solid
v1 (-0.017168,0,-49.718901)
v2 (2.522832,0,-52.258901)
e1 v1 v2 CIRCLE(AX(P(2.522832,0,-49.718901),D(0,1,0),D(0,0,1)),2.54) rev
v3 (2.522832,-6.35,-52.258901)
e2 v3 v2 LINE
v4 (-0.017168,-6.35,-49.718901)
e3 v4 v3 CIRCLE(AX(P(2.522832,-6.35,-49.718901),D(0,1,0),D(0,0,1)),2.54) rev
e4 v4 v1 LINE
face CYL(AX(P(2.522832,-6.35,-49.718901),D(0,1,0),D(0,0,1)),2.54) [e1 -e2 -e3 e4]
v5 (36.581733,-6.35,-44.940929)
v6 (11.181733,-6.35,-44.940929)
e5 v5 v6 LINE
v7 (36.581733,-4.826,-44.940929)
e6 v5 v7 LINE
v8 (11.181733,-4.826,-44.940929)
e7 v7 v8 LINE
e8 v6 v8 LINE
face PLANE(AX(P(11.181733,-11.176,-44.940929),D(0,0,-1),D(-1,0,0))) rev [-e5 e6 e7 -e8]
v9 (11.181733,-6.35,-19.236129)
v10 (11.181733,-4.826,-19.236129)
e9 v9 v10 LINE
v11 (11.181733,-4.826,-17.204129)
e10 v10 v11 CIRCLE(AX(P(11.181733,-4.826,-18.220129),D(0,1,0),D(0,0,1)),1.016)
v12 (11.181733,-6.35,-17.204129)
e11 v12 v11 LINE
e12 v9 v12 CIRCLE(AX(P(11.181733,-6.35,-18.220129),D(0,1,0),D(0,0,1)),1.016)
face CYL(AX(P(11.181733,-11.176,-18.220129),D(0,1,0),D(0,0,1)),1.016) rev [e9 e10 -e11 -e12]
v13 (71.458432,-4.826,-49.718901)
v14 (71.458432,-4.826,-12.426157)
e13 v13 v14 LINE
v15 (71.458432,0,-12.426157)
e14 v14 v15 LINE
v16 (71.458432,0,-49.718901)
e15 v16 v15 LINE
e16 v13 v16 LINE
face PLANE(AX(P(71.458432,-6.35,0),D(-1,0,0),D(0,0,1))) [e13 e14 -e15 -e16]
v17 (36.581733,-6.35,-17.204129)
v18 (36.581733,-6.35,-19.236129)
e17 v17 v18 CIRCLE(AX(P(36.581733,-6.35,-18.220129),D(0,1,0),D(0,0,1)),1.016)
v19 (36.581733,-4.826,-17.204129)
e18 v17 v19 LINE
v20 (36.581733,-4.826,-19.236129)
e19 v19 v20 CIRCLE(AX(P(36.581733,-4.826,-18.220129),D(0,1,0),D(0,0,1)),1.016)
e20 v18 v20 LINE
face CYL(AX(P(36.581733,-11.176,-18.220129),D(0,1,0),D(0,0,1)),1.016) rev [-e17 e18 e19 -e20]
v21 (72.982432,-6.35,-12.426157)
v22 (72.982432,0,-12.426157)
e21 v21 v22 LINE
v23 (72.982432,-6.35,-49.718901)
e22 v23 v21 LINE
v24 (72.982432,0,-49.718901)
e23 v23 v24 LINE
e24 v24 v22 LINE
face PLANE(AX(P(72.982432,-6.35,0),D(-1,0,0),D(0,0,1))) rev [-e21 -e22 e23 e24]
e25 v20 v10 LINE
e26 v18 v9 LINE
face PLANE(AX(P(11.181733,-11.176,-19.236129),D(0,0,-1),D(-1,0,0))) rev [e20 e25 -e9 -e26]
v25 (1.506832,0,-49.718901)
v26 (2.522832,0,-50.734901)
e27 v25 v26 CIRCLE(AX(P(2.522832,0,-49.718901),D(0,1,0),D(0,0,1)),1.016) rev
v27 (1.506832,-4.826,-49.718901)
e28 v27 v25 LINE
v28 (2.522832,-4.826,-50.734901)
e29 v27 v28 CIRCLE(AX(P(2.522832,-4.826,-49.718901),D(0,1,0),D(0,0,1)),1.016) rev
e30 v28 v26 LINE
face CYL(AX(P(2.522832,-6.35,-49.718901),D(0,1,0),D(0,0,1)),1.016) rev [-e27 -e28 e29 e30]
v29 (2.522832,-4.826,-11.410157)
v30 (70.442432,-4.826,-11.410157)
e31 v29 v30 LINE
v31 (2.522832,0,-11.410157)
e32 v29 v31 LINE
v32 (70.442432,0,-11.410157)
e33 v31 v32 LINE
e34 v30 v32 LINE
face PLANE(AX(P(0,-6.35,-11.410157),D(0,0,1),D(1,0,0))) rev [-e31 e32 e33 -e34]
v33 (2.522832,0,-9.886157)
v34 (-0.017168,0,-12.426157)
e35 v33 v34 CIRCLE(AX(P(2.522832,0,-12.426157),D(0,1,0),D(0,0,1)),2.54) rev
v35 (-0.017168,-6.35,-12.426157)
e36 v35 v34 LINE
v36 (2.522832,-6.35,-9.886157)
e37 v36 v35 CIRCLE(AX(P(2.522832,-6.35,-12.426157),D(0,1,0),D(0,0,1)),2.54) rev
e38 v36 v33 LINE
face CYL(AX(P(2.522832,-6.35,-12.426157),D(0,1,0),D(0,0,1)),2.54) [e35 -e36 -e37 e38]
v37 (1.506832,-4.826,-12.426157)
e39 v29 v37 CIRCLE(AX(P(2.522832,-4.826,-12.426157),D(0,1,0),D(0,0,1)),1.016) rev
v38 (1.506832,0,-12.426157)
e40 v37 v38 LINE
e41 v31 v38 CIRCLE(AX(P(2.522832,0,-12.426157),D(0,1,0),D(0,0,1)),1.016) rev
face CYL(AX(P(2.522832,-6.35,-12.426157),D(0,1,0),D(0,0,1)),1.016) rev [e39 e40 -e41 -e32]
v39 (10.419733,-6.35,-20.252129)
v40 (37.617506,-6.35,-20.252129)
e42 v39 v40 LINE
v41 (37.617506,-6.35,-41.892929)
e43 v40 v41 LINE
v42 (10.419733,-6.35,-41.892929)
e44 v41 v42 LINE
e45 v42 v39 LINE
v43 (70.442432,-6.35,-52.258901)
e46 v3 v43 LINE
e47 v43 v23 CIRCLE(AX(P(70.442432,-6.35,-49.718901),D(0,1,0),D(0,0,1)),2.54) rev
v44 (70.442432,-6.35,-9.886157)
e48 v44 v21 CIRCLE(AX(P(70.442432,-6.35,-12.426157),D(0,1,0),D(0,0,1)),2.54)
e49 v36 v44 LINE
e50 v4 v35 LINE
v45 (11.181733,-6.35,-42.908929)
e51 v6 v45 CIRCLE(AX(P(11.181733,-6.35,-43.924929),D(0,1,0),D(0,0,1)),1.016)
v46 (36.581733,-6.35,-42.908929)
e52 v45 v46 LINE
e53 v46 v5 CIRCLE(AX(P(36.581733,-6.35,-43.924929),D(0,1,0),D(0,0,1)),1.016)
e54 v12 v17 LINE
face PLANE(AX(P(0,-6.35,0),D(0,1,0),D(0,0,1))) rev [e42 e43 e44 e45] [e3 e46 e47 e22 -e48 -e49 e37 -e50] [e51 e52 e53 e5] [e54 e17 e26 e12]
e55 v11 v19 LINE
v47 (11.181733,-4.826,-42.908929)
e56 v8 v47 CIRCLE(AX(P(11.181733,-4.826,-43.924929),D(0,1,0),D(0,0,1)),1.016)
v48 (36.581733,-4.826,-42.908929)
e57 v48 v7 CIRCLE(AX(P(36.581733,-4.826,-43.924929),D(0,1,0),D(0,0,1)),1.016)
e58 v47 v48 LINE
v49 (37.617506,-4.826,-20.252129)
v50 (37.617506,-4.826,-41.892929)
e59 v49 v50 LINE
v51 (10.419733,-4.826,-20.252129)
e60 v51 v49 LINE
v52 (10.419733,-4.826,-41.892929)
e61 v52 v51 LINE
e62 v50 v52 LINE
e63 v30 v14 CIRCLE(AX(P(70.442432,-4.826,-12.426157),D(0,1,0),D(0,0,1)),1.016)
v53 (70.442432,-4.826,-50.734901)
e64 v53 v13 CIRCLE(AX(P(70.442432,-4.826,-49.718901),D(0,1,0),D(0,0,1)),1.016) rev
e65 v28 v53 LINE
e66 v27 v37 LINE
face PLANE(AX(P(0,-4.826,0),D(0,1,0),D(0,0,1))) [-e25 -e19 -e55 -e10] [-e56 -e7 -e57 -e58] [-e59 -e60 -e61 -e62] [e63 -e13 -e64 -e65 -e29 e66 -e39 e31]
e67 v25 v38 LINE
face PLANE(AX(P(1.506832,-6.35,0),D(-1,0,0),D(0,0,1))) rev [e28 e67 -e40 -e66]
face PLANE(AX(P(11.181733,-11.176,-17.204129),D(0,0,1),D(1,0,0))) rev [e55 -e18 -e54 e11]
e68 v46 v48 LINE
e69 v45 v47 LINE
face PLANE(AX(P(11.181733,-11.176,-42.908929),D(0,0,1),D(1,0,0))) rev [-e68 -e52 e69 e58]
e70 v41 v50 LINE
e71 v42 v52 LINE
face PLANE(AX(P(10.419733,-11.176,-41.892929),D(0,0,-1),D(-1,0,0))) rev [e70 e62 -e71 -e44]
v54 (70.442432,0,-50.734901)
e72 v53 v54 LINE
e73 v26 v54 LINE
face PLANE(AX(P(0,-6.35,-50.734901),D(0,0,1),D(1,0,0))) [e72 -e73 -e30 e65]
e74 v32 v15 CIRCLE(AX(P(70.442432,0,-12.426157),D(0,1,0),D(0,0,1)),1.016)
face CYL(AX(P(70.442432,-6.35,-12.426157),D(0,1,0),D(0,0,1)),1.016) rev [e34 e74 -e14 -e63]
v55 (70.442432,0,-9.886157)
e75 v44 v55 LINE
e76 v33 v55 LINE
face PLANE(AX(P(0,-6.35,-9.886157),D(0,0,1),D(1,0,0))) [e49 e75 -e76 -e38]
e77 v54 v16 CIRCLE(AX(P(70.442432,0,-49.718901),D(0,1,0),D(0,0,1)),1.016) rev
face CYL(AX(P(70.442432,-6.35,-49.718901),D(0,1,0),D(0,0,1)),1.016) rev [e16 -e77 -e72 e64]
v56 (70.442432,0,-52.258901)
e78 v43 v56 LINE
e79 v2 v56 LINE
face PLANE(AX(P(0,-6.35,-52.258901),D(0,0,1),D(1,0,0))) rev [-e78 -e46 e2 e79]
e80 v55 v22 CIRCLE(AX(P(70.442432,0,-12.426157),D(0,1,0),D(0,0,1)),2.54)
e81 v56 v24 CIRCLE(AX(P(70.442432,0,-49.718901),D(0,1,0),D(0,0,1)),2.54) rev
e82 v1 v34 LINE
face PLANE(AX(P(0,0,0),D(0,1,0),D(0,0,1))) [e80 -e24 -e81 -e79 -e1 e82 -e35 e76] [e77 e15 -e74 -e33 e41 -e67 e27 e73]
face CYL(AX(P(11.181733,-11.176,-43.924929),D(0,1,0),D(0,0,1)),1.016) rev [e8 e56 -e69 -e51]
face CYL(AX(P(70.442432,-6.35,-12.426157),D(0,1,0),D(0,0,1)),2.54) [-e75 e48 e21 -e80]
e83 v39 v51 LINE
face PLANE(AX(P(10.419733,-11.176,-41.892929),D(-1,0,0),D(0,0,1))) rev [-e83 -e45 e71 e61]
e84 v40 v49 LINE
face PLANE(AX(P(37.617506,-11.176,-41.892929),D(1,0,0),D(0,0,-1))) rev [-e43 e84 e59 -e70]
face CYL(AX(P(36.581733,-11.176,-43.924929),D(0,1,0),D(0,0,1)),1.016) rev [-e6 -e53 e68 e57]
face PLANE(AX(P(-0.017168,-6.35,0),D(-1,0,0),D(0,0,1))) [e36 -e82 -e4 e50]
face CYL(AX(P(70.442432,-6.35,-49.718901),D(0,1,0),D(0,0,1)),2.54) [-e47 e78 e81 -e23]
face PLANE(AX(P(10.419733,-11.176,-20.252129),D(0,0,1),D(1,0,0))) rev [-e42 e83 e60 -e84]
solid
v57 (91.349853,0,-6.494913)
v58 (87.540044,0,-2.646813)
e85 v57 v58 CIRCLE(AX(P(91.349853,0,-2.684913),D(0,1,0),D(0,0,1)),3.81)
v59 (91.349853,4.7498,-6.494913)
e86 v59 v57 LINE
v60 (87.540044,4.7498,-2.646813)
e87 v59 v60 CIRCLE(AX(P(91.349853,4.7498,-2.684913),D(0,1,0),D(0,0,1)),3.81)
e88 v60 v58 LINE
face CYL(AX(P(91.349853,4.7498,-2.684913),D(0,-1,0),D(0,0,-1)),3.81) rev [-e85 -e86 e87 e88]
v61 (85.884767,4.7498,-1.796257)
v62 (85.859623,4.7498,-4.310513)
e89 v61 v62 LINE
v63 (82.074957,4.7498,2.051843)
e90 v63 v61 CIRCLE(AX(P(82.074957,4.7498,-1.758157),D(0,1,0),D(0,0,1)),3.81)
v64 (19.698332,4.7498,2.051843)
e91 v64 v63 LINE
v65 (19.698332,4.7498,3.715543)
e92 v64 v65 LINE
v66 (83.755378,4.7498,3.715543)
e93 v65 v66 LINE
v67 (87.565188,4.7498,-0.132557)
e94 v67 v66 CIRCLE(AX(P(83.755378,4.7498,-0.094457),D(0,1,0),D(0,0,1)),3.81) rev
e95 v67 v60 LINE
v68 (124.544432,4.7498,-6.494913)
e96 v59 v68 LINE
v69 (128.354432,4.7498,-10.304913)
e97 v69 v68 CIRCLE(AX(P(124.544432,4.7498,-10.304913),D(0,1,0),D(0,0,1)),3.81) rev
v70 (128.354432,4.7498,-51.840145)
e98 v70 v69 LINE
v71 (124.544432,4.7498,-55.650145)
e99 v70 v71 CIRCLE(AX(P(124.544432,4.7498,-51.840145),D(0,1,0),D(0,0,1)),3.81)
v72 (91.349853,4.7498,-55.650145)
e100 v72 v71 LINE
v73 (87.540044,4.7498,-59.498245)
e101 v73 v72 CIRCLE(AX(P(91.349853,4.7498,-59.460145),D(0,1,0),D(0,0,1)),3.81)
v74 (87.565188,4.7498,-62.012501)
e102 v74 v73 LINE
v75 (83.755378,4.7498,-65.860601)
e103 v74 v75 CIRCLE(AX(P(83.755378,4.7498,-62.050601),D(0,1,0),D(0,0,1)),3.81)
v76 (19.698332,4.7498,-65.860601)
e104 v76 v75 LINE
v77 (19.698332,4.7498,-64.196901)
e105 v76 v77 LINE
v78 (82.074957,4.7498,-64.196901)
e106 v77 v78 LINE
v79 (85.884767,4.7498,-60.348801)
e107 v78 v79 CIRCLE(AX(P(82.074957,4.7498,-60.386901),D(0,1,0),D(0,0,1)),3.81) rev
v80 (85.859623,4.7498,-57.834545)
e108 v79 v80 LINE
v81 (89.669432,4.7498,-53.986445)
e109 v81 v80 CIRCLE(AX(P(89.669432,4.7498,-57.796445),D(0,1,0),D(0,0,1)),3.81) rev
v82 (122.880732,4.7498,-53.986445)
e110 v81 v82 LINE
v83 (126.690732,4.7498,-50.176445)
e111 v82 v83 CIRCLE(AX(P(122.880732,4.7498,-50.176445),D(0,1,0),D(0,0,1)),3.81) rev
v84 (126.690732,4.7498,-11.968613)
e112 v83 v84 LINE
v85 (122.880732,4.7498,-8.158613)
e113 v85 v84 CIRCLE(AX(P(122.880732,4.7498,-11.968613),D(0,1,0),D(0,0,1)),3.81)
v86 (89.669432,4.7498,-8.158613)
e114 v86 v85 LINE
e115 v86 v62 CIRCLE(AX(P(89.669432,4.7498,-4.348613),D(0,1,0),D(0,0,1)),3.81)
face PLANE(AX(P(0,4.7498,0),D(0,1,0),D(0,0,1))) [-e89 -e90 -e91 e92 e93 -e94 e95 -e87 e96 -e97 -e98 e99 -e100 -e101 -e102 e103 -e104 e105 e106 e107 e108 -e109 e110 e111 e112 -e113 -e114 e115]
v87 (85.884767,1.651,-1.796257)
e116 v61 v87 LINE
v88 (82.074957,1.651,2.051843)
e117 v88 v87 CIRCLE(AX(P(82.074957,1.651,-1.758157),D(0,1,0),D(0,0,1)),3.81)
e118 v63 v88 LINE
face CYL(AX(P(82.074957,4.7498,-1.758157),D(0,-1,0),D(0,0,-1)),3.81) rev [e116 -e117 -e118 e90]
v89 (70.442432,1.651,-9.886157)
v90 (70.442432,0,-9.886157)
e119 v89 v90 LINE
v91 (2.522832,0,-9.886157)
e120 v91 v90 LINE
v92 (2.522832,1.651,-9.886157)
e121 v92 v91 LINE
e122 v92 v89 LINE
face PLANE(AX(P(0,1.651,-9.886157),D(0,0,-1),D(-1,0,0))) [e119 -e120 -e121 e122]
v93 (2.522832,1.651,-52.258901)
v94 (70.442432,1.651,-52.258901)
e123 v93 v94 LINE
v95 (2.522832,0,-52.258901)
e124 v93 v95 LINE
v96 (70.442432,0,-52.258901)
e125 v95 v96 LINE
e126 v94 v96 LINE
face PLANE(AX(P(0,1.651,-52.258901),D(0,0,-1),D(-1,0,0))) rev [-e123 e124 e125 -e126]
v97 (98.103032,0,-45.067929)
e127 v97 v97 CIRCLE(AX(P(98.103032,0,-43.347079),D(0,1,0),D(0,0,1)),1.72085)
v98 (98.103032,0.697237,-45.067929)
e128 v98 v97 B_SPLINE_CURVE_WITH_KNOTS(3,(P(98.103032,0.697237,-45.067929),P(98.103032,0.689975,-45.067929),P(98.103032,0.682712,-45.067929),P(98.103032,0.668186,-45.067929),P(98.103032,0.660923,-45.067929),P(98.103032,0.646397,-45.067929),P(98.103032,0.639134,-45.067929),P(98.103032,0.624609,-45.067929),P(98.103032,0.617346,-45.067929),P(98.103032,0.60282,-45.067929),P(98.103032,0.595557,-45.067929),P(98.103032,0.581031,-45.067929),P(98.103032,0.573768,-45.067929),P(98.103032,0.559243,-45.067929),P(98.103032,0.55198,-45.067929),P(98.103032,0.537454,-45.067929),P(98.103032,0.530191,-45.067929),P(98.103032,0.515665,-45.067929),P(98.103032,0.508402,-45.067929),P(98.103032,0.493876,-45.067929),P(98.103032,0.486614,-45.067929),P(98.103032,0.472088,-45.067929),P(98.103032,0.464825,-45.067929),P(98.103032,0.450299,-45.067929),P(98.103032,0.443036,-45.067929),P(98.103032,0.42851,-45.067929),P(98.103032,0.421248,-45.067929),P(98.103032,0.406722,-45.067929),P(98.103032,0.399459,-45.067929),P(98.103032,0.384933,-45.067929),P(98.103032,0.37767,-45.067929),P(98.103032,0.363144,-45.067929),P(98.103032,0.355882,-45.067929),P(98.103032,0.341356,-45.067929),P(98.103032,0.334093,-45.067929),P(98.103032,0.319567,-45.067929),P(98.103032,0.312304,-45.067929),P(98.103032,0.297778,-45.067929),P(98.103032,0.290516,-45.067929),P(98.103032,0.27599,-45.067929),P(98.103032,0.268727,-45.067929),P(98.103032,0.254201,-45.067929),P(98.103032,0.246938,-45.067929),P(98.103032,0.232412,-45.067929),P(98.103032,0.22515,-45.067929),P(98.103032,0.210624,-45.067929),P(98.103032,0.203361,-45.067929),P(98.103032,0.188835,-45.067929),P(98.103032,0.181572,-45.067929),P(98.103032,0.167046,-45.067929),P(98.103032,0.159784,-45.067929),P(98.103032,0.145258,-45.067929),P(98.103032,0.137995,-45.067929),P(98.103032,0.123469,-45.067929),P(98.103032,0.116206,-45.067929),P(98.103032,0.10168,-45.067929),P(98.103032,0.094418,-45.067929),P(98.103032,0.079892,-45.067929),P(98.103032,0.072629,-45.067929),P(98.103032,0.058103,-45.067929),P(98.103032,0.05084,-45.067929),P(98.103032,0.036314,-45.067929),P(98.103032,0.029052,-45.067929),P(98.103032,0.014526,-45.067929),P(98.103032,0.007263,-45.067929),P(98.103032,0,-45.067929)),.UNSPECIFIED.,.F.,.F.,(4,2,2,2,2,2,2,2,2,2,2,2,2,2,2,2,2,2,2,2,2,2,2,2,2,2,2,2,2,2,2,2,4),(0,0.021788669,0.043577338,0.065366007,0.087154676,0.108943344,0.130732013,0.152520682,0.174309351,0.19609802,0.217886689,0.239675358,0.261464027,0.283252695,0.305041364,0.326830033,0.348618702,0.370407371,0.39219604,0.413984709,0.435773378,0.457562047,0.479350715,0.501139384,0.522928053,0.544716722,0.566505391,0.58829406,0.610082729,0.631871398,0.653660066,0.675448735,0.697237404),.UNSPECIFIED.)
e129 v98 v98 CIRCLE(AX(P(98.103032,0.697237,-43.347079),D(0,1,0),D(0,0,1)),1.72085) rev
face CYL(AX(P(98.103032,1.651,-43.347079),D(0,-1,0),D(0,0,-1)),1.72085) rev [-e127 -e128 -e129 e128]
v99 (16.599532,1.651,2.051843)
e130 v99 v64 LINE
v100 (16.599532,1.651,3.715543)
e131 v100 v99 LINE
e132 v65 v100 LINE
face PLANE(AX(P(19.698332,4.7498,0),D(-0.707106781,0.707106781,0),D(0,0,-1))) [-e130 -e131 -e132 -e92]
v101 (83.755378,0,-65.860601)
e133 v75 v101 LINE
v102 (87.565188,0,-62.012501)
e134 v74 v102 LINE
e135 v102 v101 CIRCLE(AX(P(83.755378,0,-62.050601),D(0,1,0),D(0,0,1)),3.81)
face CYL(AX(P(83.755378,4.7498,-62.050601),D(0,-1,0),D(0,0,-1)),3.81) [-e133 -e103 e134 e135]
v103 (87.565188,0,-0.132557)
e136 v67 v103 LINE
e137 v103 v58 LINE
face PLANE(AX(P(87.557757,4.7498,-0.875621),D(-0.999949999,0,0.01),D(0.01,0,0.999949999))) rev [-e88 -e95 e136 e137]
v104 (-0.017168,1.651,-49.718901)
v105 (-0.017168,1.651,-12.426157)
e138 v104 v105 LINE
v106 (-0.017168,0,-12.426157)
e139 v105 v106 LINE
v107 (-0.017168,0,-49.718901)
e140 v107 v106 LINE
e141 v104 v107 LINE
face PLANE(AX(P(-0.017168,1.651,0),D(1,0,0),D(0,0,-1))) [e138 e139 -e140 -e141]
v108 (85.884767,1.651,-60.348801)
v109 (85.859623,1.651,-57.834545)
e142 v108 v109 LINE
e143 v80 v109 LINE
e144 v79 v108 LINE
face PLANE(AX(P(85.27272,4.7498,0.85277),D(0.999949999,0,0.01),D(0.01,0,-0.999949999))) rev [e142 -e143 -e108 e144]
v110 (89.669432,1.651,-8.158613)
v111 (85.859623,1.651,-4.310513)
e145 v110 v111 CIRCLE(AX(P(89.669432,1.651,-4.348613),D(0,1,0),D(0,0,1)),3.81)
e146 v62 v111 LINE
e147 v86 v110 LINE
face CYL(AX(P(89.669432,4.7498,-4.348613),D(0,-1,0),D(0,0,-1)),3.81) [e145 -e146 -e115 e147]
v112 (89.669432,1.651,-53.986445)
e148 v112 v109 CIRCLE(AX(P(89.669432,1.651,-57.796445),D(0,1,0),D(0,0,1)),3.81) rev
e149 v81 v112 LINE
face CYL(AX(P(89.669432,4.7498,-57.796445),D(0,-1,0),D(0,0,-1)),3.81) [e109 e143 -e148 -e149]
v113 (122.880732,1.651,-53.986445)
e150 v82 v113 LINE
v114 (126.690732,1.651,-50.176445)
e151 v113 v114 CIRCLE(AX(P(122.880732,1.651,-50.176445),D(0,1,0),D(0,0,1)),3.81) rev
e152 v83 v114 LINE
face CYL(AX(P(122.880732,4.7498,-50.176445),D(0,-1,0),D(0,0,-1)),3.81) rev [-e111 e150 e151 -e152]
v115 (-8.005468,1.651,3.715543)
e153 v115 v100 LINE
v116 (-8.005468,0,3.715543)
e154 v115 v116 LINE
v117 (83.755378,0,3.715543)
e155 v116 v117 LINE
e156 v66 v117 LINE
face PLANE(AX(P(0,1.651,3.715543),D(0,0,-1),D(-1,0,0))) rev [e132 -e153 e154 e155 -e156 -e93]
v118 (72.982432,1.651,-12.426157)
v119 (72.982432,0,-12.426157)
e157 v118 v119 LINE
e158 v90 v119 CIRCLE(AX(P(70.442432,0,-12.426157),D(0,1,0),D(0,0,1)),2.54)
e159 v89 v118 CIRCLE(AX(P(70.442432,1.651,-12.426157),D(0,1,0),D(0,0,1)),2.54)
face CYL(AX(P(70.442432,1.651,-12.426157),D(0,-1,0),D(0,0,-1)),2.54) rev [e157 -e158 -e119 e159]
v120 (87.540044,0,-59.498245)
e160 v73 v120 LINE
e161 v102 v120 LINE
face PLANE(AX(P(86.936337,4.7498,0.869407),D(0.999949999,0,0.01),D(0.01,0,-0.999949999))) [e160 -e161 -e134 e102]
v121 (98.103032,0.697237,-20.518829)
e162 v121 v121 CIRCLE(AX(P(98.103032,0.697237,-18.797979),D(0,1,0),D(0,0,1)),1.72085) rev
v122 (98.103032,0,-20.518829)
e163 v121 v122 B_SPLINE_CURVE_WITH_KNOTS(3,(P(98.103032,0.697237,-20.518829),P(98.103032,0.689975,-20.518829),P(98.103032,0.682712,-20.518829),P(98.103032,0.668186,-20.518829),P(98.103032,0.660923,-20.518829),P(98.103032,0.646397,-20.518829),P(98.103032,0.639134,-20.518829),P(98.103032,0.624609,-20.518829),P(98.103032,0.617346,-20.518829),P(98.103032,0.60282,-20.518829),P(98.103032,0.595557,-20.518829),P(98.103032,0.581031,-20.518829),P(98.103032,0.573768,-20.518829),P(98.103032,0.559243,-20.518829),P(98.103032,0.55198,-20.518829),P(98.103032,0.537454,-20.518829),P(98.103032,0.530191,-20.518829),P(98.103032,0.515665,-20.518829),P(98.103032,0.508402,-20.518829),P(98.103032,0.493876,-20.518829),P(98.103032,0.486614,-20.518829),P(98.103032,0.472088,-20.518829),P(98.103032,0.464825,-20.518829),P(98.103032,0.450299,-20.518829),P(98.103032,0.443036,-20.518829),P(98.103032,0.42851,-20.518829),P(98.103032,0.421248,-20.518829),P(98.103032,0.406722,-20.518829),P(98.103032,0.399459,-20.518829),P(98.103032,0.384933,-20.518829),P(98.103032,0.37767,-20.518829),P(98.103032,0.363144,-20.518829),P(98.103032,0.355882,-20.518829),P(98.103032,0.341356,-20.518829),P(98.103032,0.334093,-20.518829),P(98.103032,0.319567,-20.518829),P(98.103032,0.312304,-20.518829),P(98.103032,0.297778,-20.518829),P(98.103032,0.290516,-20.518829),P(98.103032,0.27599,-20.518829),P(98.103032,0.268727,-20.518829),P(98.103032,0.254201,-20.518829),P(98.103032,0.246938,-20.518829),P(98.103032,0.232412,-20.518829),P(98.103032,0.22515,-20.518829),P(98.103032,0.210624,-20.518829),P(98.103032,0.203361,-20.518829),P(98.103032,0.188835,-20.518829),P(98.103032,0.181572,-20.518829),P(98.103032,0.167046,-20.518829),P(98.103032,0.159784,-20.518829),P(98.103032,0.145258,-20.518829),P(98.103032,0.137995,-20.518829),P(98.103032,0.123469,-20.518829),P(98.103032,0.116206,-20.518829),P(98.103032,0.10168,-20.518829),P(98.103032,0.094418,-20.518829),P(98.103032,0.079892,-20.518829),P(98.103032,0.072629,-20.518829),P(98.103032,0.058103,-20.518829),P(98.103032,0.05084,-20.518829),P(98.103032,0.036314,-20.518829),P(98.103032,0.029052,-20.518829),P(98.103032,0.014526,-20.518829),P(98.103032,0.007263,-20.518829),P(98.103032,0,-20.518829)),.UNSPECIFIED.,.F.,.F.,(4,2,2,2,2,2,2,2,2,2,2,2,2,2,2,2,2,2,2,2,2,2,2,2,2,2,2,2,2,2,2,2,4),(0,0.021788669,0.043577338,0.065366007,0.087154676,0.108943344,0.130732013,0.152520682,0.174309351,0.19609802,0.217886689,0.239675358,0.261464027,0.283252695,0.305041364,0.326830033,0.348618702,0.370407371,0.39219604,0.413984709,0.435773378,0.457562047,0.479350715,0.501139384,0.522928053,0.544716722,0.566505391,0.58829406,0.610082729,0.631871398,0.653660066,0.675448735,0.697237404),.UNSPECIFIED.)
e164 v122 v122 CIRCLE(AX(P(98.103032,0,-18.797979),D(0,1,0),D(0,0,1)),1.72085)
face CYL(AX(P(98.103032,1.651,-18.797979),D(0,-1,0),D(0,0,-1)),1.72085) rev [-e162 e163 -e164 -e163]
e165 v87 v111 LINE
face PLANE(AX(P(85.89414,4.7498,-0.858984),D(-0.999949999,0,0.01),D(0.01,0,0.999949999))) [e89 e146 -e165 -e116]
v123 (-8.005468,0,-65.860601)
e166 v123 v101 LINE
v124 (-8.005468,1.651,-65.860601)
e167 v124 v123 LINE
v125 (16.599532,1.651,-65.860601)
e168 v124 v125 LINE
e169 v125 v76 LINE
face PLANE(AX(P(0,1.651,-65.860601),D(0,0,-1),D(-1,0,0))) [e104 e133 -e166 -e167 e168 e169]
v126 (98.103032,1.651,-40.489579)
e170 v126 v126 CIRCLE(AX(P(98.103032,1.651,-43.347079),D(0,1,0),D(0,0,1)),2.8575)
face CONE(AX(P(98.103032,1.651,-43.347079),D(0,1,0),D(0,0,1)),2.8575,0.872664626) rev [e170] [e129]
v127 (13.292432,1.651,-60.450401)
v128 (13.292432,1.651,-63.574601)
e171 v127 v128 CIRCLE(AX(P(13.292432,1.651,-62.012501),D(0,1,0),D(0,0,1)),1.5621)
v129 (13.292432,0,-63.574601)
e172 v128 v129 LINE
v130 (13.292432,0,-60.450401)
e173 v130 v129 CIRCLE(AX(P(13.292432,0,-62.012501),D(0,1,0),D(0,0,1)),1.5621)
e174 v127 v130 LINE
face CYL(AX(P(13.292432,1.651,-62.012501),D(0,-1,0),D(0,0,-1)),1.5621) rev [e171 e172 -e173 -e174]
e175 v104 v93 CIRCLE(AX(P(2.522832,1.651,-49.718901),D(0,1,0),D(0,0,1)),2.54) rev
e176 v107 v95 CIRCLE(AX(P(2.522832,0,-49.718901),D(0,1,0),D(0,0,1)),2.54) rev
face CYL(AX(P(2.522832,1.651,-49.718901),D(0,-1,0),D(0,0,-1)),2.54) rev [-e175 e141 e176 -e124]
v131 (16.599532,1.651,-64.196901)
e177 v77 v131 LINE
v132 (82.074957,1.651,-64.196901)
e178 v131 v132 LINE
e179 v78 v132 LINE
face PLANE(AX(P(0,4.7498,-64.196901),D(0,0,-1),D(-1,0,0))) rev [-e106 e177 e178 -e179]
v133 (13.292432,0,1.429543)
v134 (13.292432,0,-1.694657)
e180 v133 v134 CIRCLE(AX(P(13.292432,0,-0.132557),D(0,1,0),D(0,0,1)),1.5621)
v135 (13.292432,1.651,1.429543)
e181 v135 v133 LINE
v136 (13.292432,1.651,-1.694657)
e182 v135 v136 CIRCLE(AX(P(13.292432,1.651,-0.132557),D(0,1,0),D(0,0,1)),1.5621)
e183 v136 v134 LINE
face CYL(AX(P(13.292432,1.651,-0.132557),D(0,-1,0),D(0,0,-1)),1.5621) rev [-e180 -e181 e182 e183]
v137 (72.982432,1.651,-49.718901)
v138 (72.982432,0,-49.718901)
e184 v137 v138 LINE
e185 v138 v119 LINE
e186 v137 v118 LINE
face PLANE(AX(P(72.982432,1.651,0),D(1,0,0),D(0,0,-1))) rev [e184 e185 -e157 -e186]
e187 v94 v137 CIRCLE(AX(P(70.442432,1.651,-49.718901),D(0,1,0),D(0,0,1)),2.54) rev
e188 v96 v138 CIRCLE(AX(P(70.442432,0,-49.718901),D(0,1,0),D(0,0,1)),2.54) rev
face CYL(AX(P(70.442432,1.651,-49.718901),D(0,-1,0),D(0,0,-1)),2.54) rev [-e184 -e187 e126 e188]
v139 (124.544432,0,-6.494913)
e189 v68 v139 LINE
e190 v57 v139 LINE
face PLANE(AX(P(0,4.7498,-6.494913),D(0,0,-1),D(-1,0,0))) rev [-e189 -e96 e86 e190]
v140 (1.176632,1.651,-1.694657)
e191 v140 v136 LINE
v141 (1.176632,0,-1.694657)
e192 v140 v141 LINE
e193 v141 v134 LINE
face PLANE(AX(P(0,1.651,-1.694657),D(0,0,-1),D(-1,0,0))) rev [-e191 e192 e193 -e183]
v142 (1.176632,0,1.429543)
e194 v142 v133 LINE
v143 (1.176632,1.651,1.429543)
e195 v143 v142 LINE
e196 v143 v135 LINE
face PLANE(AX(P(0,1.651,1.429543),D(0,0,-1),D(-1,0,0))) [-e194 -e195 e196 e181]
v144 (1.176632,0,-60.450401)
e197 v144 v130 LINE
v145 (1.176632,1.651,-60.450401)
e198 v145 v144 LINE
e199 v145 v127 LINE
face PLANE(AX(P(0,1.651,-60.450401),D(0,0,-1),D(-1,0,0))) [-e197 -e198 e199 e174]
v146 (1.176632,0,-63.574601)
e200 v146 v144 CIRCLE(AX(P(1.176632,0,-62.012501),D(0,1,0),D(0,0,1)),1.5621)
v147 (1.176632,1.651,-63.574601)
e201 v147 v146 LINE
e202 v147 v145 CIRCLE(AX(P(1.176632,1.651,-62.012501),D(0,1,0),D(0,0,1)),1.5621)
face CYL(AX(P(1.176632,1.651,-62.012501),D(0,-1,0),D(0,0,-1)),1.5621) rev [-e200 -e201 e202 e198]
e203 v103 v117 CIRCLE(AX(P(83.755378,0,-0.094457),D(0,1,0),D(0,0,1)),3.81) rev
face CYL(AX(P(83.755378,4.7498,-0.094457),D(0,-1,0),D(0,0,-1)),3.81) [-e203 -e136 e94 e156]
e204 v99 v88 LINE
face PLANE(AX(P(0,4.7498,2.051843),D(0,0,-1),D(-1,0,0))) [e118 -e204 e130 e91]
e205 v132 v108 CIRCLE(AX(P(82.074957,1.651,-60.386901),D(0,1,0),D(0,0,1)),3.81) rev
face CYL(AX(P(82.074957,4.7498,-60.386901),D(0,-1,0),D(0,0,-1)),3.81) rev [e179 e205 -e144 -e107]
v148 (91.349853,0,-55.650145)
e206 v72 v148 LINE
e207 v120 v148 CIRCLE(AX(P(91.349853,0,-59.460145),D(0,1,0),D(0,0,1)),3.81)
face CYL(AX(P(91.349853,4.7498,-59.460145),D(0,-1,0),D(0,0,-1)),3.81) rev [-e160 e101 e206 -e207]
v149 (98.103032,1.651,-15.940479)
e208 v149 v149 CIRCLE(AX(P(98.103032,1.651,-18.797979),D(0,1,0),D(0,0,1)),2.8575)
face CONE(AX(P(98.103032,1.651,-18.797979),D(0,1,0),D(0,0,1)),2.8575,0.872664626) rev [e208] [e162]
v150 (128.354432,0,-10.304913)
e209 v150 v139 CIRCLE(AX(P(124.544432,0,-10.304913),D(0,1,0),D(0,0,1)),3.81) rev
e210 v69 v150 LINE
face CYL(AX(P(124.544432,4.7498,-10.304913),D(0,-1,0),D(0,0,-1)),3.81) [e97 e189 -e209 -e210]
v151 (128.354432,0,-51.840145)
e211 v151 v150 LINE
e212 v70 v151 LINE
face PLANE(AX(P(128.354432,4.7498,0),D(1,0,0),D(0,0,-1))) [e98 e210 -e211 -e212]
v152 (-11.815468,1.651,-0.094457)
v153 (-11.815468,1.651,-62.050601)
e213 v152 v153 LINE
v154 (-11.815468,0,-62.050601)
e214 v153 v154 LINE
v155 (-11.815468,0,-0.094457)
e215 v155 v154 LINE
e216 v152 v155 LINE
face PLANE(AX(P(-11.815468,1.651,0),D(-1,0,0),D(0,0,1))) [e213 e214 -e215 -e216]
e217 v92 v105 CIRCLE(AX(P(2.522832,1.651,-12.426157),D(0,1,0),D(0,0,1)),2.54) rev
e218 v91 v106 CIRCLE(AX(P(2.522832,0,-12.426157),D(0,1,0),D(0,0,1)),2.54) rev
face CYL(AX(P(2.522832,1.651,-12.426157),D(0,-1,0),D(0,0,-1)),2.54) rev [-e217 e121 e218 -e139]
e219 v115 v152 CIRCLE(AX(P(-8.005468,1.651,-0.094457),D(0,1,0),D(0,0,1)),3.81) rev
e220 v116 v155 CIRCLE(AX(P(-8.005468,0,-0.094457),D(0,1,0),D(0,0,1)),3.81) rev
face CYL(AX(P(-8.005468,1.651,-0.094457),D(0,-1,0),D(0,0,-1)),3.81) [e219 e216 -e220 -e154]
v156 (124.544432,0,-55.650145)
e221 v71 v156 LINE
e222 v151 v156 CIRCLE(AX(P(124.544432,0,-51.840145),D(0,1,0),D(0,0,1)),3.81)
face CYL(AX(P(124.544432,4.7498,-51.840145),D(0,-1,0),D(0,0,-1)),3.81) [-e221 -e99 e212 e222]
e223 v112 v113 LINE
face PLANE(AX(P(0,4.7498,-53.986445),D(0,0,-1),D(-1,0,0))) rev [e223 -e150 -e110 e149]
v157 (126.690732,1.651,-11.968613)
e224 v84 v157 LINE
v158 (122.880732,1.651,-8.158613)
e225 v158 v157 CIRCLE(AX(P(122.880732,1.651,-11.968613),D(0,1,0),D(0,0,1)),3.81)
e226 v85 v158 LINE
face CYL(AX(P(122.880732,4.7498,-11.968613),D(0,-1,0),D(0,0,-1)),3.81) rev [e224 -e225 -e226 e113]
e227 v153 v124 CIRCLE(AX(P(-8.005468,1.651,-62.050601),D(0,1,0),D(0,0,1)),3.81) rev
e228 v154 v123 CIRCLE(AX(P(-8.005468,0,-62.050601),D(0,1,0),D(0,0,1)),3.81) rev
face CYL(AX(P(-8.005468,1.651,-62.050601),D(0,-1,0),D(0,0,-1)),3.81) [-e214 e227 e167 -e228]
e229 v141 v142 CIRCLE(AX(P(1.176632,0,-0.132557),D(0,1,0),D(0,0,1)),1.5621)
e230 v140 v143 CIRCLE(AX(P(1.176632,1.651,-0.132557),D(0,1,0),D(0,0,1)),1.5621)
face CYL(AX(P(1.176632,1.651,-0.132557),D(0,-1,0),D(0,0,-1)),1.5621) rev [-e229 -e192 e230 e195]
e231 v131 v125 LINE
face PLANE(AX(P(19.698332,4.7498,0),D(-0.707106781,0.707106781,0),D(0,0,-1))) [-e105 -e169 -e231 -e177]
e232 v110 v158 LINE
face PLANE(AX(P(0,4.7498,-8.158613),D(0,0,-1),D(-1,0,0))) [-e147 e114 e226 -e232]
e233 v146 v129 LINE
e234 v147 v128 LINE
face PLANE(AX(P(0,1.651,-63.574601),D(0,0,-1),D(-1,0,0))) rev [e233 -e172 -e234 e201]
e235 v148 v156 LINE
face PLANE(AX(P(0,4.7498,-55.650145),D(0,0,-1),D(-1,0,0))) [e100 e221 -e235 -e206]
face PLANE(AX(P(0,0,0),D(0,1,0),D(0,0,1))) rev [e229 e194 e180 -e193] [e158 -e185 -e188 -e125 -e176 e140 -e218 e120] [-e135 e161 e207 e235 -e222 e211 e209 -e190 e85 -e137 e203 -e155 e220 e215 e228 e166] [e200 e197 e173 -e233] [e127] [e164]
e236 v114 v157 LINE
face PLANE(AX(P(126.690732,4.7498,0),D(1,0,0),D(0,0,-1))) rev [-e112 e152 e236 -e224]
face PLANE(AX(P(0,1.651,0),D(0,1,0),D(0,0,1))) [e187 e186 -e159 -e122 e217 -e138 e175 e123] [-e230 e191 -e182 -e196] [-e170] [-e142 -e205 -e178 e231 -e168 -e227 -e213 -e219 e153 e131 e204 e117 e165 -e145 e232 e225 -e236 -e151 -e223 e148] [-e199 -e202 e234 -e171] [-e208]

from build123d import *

# Parameters (mm, degrees)
SKETCH3_R                                 = 1.72085
BOSS_EXTRUDE3_DEPTH                       = 1.651
BOSS_EXTRUDE4_DEPTH                       = 4.7498
BOSS_EXTRUDE5_DEPTH                       = 6.35
SHELL1_T                                  = -1.524
SKETCH6_W                                 = 27.197772805
SKETCH6_H                                 = 21.6408
CUT_EXTRUDE1_DEPTH                        = 6.35
CSK_FOR_4_FLAT_HEAD_MACHINE_SCREW_2_COUNT = 2
CSK_FOR_4_FLAT_HEAD_MACHINE_SCREW_2_PITCH = 24.5491
CHAMFER2_SIZE                             = 4.92


with BuildPart() as part:
    # Sketch3 → Boss-Extrude3 (new body)
    with BuildSketch(Plane(origin=(0, 0, 0), x_dir=(1, 0, 0), z_dir=(0, 1, 0))):
        with BuildLine():
            Line((14.778331881, 64.196901379), (14.778331881, 65.860601379))
            Line((14.778331881, 65.860601379), (-8.005468119, 65.860601379))
            ThreePointArc((-8.005468119, 65.860601379), (-10.699544955, 64.744678215), (-11.815468119, 62.050601379))
            Line((-11.815468119, 62.050601379), (-11.815468119, 0.094456509))
            ThreePointArc((-11.815468119, 0.094456509), (-10.699544955, -2.599620328), (-8.005468119, -3.715543491))
            Line((-8.005468119, -3.715543491), (14.778331881, -3.715543491))
            Line((14.778331881, -3.715543491), (14.778331881, -2.051843491))
            Line((14.778331881, -2.051843491), (82.074957291, -2.051843491))
            ThreePointArc((82.074957291, -2.051843491), (84.782471003, -0.922416098), (85.884766787, 1.796256509))
            Line((85.884766787, 1.796256509), (85.859622964, 4.310513079))
            ThreePointArc((85.859622964, 4.310513079), (86.961918747, 7.029185686), (89.669432459, 8.158613079))
            Line((89.669432459, 8.158613079), (122.880731881, 8.158613079))
            ThreePointArc((122.880731881, 8.158613079), (125.574808718, 9.274536243), (126.690731881, 11.968613079))
            Line((126.690731881, 11.968613079), (126.690731881, 50.176444808))
            ThreePointArc((126.690731881, 50.176444808), (125.574808718, 52.870521644), (122.880731881, 53.986444808))
            Line((122.880731881, 53.986444808), (89.669432459, 53.986444808))
            ThreePointArc((89.669432459, 53.986444808), (86.961918747, 55.115872201), (85.859622964, 57.834544808))
            Line((85.859622964, 57.834544808), (85.884766787, 60.348801379))
            ThreePointArc((85.884766787, 60.348801379), (84.782471003, 63.067473985), (82.074957291, 64.196901379))
            Line((82.074957291, 64.196901379), (14.778331881, 64.196901379))
        make_face()
        with BuildLine():
            ThreePointArc((1.176631881, -1.429543491), (-0.385468119, 0.132556509), (1.176631881, 1.694656509))
            Line((1.176631881, 1.694656509), (13.292431881, 1.694656509))
            ThreePointArc((13.292431881, 1.694656509), (14.854531881, 0.132556509), (13.292431881, -1.429543491))
            Line((13.292431881, -1.429543491), (1.176631881, -1.429543491))
        make_face(mode=Mode.SUBTRACT)
        with BuildLine():
            ThreePointArc((-0.017168119, 49.718901379), (0.726780657, 51.514952603), (2.522831881, 52.258901379))
            Line((2.522831881, 52.258901379), (70.442431881, 52.258901379))
            ThreePointArc((70.442431881, 52.258901379), (72.238483106, 51.514952603), (72.982431881, 49.718901379))
            Line((72.982431881, 49.718901379), (72.982431881, 12.426156509))
            ThreePointArc((72.982431881, 12.426156509), (72.238483106, 10.630105284), (70.442431881, 9.886156509))
            Line((70.442431881, 9.886156509), (2.522831881, 9.886156509))
            ThreePointArc((2.522831881, 9.886156509), (0.726780657, 10.630105284), (-0.017168119, 12.426156509))
            Line((-0.017168119, 12.426156509), (-0.017168119, 49.718901379))
        make_face(mode=Mode.SUBTRACT)
        with Locations(Location((98.103031881, 18.797978944, 0), (0, 0, 90))):
            Circle(SKETCH3_R, mode=Mode.SUBTRACT)
        with BuildLine():
            ThreePointArc((1.176631881, 60.450401379), (-0.385468119, 62.012501379), (1.176631881, 63.574601379))
            Line((1.176631881, 63.574601379), (13.292431881, 63.574601379))
            ThreePointArc((13.292431881, 63.574601379), (14.854531881, 62.012501379), (13.292431881, 60.450401379))
            Line((13.292431881, 60.450401379), (1.176631881, 60.450401379))
        make_face(mode=Mode.SUBTRACT)
        with Locations(Location((98.103031881, 43.347078944, 0), (0, 0, 90))):
            Circle(SKETCH3_R, mode=Mode.SUBTRACT)
    extrude(amount=BOSS_EXTRUDE3_DEPTH)

    # Sketch3<4> → Boss-Extrude4 (add)
    with BuildSketch(Plane(origin=(0, 0, 0), x_dir=(1, 0, 0), z_dir=(0, 1, 0))):
        with BuildLine():
            Line((87.540043987, 59.498244808), (87.56518781, 62.012501379))
            ThreePointArc((87.56518781, 62.012501379), (86.462892026, 64.731173985), (83.755378315, 65.860601379))
            Line((83.755378315, 65.860601379), (14.778331881, 65.860601379))
            Line((14.778331881, 65.860601379), (14.778331881, 64.196901379))
            Line((14.778331881, 64.196901379), (82.074957291, 64.196901379))
            ThreePointArc((82.074957291, 64.196901379), (84.782471003, 63.067473985), (85.884766787, 60.348801379))
            Line((85.884766787, 60.348801379), (85.859622964, 57.834544808))
            ThreePointArc((85.859622964, 57.834544808), (86.961918747, 55.115872201), (89.669432459, 53.986444808))
            Line((89.669432459, 53.986444808), (122.880731881, 53.986444808))
            ThreePointArc((122.880731881, 53.986444808), (125.574808718, 52.870521644), (126.690731881, 50.176444808))
            Line((126.690731881, 50.176444808), (126.690731881, 11.968613079))
            ThreePointArc((126.690731881, 11.968613079), (125.574808718, 9.274536243), (122.880731881, 8.158613079))
            Line((122.880731881, 8.158613079), (89.669432459, 8.158613079))
            ThreePointArc((89.669432459, 8.158613079), (86.961918747, 7.029185686), (85.859622964, 4.310513079))
            Line((85.859622964, 4.310513079), (85.884766787, 1.796256509))
            ThreePointArc((85.884766787, 1.796256509), (84.782471003, -0.922416098), (82.074957291, -2.051843491))
            Line((82.074957291, -2.051843491), (14.778331881, -2.051843491))
            Line((14.778331881, -2.051843491), (14.778331881, -3.715543491))
            Line((14.778331881, -3.715543491), (83.755378315, -3.715543491))
            ThreePointArc((83.755378315, -3.715543491), (86.462892026, -2.586116098), (87.56518781, 0.132556509))
            Line((87.56518781, 0.132556509), (87.540043987, 2.646813079))
            ThreePointArc((87.540043987, 2.646813079), (88.64233977, 5.365485686), (91.349853482, 6.494913079))
            Line((91.349853482, 6.494913079), (124.544431881, 6.494913079))
            ThreePointArc((124.544431881, 6.494913079), (127.238508718, 7.610836243), (128.354431881, 10.304913079))
            Line((128.354431881, 10.304913079), (128.354431881, 51.840144808))
            ThreePointArc((128.354431881, 51.840144808), (127.238508718, 54.534221644), (124.544431881, 55.650144808))
            Line((124.544431881, 55.650144808), (91.349853482, 55.650144808))
            ThreePointArc((91.349853482, 55.650144808), (88.64233977, 56.779572201), (87.540043987, 59.498244808))
        make_face()
    extrude(amount=BOSS_EXTRUDE4_DEPTH)

    # Sketch9 → CSK for #4 Flat Head Machine Screw (100)1 (revolve, cut)
    with BuildSketch(Plane(origin=(98.103031881, 1.651, -43.347078944), x_dir=(0, 0, 1), z_dir=(1, 0, 0))):
        Polygon((0, 0), (0, 8.001), (1.63195, 8.001), (1.63195, 1.028358553), (2.8575, 0), align=None)
    csk_for_4_flat_head_machine_screw_100 = revolve(axis=Axis((98.103031881, 8.001, -43.347078944), (0, -1, 0)), mode=Mode.SUBTRACT)

    # CSK for _4 Flat Head Machine Screw _ 2: CSK for #4 Flat Head Machine Screw (100)1 ×2
    with Locations(*[(0, 0, i * CSK_FOR_4_FLAT_HEAD_MACHINE_SCREW_2_PITCH) for i in range(1, CSK_FOR_4_FLAT_HEAD_MACHINE_SCREW_2_COUNT)]):
        add(csk_for_4_flat_head_machine_screw_100, mode=Mode.SUBTRACT)

    # Chamfer2
    # the kernel refuses this chamfer: 4.92 mm, written as the material it takes off along each edge
    with BuildSketch(Plane(origin=(14.778331881, 4.7498, -10.600836809), x_dir=(0.9996219169112966, 0.027495876610586407, 0), z_dir=(0, 0, 1))) as chamfer2_piece_1_section:
        Polygon((CHAMFER2_SIZE * 0.999621916911, -CHAMFER2_SIZE * 0.0274958766106), (-CHAMFER2_SIZE * 0.0274958766106, -CHAMFER2_SIZE * 0.999621916911), (0, 0), align=None)
    chamfer2_piece_1 = extrude(amount=26.969060602, mode=Mode.PRIVATE)
    chamfer2_piece_1 = split(chamfer2_piece_1, bisect_by=Plane(origin=(16.59853765, 1.651, 2.883693491), z_dir=(0, 1, 0)), keep=Keep.TOP, mode=Mode.PRIVATE)
    add(chamfer2_piece_1, mode=Mode.SUBTRACT)
    with BuildSketch(Plane(origin=(14.778331881, 4.7498, -78.513281679), x_dir=(0.9996219169112966, 0.027495876610586407, 0), z_dir=(0, 0, 1))) as chamfer2_piece_2_section:
        Polygon((CHAMFER2_SIZE * 0.999621916911, -CHAMFER2_SIZE * 0.0274958766106), (-CHAMFER2_SIZE * 0.0274958766106, -CHAMFER2_SIZE * 0.999621916911), (0, 0), align=None)
    chamfer2_piece_2 = extrude(amount=26.969060602, mode=Mode.PRIVATE)
    chamfer2_piece_2 = split(chamfer2_piece_2, bisect_by=Plane(origin=(16.59853765, 1.651, -65.028751379), z_dir=(0, 1, 0)), keep=Keep.TOP, mode=Mode.PRIVATE)
    add(chamfer2_piece_2, mode=Mode.SUBTRACT)


with BuildPart() as body_2:
    # Sketch3<5> → Boss-Extrude5 (new body)
    with BuildSketch(Plane(origin=(0, 0, 0), x_dir=(1, 0, 0), z_dir=(0, 1, 0))):
        with BuildLine():
            ThreePointArc((-0.017168119, 49.718901379), (0.726780657, 51.514952603), (2.522831881, 52.258901379))
            Line((2.522831881, 52.258901379), (70.442431881, 52.258901379))
            ThreePointArc((70.442431881, 52.258901379), (72.238483106, 51.514952603), (72.982431881, 49.718901379))
            Line((72.982431881, 49.718901379), (72.982431881, 12.426156509))
            ThreePointArc((72.982431881, 12.426156509), (72.238483106, 10.630105284), (70.442431881, 9.886156509))
            Line((70.442431881, 9.886156509), (2.522831881, 9.886156509))
            ThreePointArc((2.522831881, 9.886156509), (0.726780657, 10.630105284), (-0.017168119, 12.426156509))
            Line((-0.017168119, 12.426156509), (-0.017168119, 49.718901379))
        make_face()
    extrude(amount=-BOSS_EXTRUDE5_DEPTH)

    # Shell1
    shell1_openings = [body_2.faces().sort_by_distance(p)[0] for p in [
        (36.482631881, 0, -31.072528944),
    ]]
    offset(amount=SHELL1_T, openings=shell1_openings, kind=Kind.INTERSECTION)

    # Sketch6 → Cut-Extrude1 (cut)
    with BuildSketch(Plane(origin=(0, -4.826, 0), x_dir=(1, 0, 0), z_dir=(0, 1, 0))):
        with BuildLine():
            Line((11.181733129, 44.940928944), (36.581733129, 44.940928944))
            ThreePointArc((36.581733129, 44.940928944), (37.597733129, 43.924928944), (36.581733129, 42.908928944))
            Line((36.581733129, 42.908928944), (11.181733129, 42.908928944))
            ThreePointArc((11.181733129, 42.908928944), (10.165733129, 43.924928944), (11.181733129, 44.940928944))
        make_face()
        with BuildLine():
            Line((11.181733129, 19.236128944), (36.581733129, 19.236128944))
            ThreePointArc((36.581733129, 19.236128944), (37.597733129, 18.220128944), (36.581733129, 17.204128944))
            Line((36.581733129, 17.204128944), (11.181733129, 17.204128944))
            ThreePointArc((11.181733129, 17.204128944), (10.165733129, 18.220128944), (11.181733129, 19.236128944))
        make_face()
        with Locations((24.018619532, 31.072528944)):
            Rectangle(SKETCH6_W, SKETCH6_H)
    extrude(amount=-CUT_EXTRUDE1_DEPTH, mode=Mode.SUBTRACT)


solid = Compound([part.part, body_2.part])
